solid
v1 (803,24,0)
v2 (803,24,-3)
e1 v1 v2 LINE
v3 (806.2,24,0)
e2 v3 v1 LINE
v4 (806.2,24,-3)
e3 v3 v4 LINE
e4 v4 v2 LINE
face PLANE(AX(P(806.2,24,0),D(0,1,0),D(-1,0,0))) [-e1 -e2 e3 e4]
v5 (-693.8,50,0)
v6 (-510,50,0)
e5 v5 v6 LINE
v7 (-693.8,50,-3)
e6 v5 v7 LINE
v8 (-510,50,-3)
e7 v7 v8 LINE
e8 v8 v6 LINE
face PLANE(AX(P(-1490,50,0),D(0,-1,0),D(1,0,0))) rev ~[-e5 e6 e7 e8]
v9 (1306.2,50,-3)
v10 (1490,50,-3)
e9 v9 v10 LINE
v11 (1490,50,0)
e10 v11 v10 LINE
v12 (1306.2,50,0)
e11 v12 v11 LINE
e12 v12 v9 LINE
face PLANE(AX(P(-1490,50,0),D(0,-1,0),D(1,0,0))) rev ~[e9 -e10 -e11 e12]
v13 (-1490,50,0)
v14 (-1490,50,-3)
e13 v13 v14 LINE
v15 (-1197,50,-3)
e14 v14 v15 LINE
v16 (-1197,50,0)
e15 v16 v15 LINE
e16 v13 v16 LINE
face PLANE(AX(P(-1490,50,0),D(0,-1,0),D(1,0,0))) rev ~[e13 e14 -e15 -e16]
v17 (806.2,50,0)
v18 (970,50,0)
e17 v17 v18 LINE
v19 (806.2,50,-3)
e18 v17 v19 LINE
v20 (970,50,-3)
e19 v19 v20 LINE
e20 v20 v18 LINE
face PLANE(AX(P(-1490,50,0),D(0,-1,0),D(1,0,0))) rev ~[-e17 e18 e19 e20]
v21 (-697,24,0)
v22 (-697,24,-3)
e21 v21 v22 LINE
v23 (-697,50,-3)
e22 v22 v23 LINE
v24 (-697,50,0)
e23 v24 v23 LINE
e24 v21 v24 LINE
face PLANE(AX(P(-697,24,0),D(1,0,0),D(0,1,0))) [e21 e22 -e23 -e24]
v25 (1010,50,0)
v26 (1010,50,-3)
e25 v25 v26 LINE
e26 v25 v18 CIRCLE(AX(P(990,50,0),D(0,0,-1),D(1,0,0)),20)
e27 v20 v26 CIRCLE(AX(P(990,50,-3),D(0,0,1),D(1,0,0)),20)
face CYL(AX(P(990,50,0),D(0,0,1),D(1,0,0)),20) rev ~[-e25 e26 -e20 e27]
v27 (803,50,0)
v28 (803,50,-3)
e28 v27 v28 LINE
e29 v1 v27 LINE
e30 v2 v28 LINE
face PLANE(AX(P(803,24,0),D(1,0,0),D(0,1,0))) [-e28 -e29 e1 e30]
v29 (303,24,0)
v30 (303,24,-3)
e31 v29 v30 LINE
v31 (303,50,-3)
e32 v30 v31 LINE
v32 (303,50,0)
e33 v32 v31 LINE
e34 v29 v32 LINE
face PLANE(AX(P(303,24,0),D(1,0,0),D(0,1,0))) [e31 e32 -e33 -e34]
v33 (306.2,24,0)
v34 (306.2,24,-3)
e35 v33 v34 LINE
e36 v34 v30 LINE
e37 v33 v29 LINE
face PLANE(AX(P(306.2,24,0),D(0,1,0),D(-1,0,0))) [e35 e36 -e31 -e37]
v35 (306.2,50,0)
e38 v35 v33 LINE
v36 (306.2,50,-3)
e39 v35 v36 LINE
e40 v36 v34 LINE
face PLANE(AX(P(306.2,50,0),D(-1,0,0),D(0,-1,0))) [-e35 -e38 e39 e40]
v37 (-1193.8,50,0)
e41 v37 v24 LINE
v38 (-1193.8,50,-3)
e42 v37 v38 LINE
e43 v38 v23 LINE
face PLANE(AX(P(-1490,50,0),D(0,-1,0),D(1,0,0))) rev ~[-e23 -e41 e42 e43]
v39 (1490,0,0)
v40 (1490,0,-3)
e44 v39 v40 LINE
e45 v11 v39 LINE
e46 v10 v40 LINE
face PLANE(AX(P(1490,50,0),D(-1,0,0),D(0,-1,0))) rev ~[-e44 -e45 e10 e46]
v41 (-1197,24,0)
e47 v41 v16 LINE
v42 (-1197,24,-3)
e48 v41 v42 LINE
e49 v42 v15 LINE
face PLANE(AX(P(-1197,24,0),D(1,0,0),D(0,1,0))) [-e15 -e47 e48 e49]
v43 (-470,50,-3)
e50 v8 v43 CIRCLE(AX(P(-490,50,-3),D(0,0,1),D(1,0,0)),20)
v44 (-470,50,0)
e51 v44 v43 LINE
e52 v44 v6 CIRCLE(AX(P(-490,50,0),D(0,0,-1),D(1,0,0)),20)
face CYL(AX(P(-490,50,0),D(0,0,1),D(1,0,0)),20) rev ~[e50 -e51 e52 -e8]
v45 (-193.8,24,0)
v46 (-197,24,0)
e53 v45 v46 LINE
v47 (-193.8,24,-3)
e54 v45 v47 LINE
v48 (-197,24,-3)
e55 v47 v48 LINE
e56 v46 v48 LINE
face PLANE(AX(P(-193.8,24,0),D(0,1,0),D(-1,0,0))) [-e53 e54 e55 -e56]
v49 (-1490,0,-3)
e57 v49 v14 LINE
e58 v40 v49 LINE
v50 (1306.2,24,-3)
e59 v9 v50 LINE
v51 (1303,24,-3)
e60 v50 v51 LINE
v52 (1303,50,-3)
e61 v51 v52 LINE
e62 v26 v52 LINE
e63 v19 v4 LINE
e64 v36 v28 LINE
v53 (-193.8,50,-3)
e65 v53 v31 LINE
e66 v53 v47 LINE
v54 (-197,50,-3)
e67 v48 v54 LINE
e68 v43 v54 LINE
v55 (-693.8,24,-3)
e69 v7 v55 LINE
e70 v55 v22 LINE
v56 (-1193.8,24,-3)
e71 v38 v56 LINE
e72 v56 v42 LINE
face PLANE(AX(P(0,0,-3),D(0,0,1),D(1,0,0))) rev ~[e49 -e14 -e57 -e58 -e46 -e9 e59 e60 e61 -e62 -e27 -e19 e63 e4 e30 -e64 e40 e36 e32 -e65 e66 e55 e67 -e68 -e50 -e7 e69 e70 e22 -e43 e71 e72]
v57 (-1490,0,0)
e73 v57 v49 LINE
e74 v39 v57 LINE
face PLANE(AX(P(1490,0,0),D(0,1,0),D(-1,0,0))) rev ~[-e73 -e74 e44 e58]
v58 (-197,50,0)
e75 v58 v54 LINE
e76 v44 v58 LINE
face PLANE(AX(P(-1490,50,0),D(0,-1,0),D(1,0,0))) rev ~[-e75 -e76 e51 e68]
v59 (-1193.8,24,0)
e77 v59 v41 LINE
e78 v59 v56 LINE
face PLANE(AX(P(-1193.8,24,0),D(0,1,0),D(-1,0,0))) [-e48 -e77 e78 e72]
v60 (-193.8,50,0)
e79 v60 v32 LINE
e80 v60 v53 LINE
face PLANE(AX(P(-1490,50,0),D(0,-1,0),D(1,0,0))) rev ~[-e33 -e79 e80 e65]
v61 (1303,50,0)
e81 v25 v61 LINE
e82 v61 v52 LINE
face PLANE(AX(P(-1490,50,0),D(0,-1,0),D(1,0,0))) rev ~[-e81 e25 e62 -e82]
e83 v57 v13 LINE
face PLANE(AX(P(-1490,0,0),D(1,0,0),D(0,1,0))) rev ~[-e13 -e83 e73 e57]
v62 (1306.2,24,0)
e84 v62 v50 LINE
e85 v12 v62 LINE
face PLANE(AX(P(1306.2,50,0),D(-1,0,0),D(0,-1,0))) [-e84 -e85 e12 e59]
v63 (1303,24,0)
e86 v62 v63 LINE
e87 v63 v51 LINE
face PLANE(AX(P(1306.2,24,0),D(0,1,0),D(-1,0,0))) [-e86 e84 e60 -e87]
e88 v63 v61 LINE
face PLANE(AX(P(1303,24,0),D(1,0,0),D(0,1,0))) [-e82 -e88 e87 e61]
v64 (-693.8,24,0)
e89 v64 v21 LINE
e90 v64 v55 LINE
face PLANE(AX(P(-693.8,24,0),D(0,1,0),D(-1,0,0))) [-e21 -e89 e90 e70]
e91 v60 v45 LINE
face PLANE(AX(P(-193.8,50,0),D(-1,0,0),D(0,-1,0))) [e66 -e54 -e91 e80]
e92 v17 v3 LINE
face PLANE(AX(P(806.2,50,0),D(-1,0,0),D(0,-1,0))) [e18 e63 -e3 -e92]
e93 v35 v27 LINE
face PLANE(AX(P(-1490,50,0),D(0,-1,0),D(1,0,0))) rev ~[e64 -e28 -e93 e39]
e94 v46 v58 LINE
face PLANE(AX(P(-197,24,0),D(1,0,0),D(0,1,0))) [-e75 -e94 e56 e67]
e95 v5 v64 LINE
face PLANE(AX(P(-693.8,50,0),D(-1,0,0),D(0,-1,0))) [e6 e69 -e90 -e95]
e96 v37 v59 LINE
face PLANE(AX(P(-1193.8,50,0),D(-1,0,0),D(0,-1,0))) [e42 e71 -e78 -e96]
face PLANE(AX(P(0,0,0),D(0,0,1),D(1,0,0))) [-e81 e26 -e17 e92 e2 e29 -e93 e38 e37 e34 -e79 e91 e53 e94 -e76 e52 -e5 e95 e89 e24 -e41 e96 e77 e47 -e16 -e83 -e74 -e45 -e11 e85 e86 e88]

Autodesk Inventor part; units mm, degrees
ref_plane "YZ Plane" through (0, 0, 0) normal (1, 0, 0) x (0, 1, 0)
ref_plane "XZ Plane" through (0, 0, 0) normal (0, 1, 0) x (-1, 0, 0)
ref_plane "XY Plane" through (0, 0, 0) normal (0, 0, 1) x (1, 0, 0)
sketch "Sketch8" plane through (0, 0, 0) normal (0, 0, 1) x (1, 0, 0)
  line L0 (-1490, 50) -> (1490, 50)
  line L1 (1490, 50) -> (1490, 0)
  line L2 (1490, 0) -> (-1490, 0)
  line L3 (-1490, 0) -> (-1490, 50)
  point P0 (0, 0)
  point P1 (0, 0)
  dimension "d37" = 50
  dimension "d38" = 2980
extrude "Plate5" add sketch "Sketch8" against normal blind 3
sketch "Sketch9" plane through (0, 0, 0) normal (0, 0, 1) x (1, 0, 0)
  line L0 (1490, 50) -> (-1490, 50) projected
  line L1 (-1197, 50) -> (-1193.8, 50)
  line L2 (-1193.8, 50) -> (-1193.8, 24)
  line L3 (-1193.8, 24) -> (-1197, 24)
  line L4 (-1197, 24) -> (-1197, 50)
  line L5 (-1490, 50) -> (-1490, 0) projected
  point P0 (0, 0)
  point P1 (-1193.8, 50)
  dimension "d42" = 293
  dimension "d43" = 3.2
  dimension "d44" = 26
extrude "Extrusion3" cut sketch "Sketch9" against normal through all
pattern_linear "Rectangular Pattern2" count 6 spacing 500 along (1, 0, 0) of "Extrusion3"
sketch "Sketch10" plane through (0, 0, 0) normal (0, 0, 1) x (1, 0, 0)
  line L0 (1303, 24) -> (1303, 50) projected
  line L1 (1303, 50) -> (806.2, 50) projected
  line L2 (806.2, 50) -> (806.2, 24) projected
  line L3 (806.2, 24) -> (803, 24) projected
  line L4 (803, 24) -> (803, 50) projected
  line L5 (803, 50) -> (306.2, 50) projected
  line L6 (306.2, 50) -> (306.2, 24) projected
  line L7 (306.2, 24) -> (303, 24) projected
  line L8 (303, 24) -> (303, 50) projected
  line L9 (303, 50) -> (-193.8, 50) projected
  line L10 (-193.8, 50) -> (-193.8, 24) projected
  line L11 (-193.8, 24) -> (-197, 24) projected
  line L12 (-197, 24) -> (-197, 50) projected
  line L13 (-197, 50) -> (-693.8, 50) projected
  line L14 (-693.8, 50) -> (-693.8, 24) projected
  line L15 (-693.8, 24) -> (-697, 24) projected
  line L16 (-697, 24) -> (-697, 50) projected
  line L17 (-697, 50) -> (-1193.8, 50) projected
  line L18 (-1193.8, 50) -> (-1193.8, 24) projected
  line L19 (-1193.8, 24) -> (-1197, 24) projected
  line L20 (-1197, 24) -> (-1197, 50) projected
  line L21 (-1197, 50) -> (-1490, 50) projected
  line L22 (-1490, 50) -> (-1490, 0) projected
  line L23 (-1490, 0) -> (1490, 0) projected
  line L24 (1490, 0) -> (1490, 50) projected
  line L25 (1490, 50) -> (1306.2, 50) projected
  line L26 (1306.2, 50) -> (1306.2, 24) projected
  line L27 (1306.2, 24) -> (1303, 24) projected
  circle A0 centre (-490, 50) radius 20
  circle A1 centre (990, 50) radius 20
  point P0 (0, 0)
  point P1 (1340, 50)
  point P2 (1380, 50)
  point P3 (-140, 50)
  point P4 (-100, 50)
  point P5 (970, 50)
  point P6 (1010, 50)
  point P7 (-510, 50)
  point P8 (-470, 50)
  dimension "d50" = 40
  dimension "d51" = 1480
  dimension "d52" = 1000
extrude "Extrusion4" cut sketch "Sketch10" against normal through all contours A1 L1 | L1 A1 | A0 L13 | L13 A0
sketch "Sketch11" plane through (0, 0, 0) normal (0, 0, 1) x (1, 0, 0)
  line L0 (-1473.7105, 19.3646) -> (-1242.1993, 19.3646) construction
  line L1 (-1242.1993, 19.3646) -> (-1242.1993, 3.0803) construction
  line L2 (-1242.1993, 3.0803) -> (-1473.7105, 3.0803) construction
  line L3 (-1473.7105, 3.0803) -> (-1473.7105, 19.3646) construction
  point P0 (0, 0)
mark "Mark1"
equation "\"d41\" = Thickness"
equation "\"BendReliefWidth\" = Thickness"
equation "\"BendReliefDepth\" = 0.5 * Thickness"
equation "\"CornerReliefSize\" = 4 * Thickness"
equation "\"MinimumRemnant\" = 2 * Thickness"
equation "\"TransitionRadius\" = BendRadius"
equation "\"JacobiRadiusSize\" = BendRadius"
equation "\"GapSize\" = Thickness"
equation "\"Thickness\" = 3"
equation "\"BendRadius\" = 5"
properties part number "BSH 032 stringer floor 2" material "09g2s"
